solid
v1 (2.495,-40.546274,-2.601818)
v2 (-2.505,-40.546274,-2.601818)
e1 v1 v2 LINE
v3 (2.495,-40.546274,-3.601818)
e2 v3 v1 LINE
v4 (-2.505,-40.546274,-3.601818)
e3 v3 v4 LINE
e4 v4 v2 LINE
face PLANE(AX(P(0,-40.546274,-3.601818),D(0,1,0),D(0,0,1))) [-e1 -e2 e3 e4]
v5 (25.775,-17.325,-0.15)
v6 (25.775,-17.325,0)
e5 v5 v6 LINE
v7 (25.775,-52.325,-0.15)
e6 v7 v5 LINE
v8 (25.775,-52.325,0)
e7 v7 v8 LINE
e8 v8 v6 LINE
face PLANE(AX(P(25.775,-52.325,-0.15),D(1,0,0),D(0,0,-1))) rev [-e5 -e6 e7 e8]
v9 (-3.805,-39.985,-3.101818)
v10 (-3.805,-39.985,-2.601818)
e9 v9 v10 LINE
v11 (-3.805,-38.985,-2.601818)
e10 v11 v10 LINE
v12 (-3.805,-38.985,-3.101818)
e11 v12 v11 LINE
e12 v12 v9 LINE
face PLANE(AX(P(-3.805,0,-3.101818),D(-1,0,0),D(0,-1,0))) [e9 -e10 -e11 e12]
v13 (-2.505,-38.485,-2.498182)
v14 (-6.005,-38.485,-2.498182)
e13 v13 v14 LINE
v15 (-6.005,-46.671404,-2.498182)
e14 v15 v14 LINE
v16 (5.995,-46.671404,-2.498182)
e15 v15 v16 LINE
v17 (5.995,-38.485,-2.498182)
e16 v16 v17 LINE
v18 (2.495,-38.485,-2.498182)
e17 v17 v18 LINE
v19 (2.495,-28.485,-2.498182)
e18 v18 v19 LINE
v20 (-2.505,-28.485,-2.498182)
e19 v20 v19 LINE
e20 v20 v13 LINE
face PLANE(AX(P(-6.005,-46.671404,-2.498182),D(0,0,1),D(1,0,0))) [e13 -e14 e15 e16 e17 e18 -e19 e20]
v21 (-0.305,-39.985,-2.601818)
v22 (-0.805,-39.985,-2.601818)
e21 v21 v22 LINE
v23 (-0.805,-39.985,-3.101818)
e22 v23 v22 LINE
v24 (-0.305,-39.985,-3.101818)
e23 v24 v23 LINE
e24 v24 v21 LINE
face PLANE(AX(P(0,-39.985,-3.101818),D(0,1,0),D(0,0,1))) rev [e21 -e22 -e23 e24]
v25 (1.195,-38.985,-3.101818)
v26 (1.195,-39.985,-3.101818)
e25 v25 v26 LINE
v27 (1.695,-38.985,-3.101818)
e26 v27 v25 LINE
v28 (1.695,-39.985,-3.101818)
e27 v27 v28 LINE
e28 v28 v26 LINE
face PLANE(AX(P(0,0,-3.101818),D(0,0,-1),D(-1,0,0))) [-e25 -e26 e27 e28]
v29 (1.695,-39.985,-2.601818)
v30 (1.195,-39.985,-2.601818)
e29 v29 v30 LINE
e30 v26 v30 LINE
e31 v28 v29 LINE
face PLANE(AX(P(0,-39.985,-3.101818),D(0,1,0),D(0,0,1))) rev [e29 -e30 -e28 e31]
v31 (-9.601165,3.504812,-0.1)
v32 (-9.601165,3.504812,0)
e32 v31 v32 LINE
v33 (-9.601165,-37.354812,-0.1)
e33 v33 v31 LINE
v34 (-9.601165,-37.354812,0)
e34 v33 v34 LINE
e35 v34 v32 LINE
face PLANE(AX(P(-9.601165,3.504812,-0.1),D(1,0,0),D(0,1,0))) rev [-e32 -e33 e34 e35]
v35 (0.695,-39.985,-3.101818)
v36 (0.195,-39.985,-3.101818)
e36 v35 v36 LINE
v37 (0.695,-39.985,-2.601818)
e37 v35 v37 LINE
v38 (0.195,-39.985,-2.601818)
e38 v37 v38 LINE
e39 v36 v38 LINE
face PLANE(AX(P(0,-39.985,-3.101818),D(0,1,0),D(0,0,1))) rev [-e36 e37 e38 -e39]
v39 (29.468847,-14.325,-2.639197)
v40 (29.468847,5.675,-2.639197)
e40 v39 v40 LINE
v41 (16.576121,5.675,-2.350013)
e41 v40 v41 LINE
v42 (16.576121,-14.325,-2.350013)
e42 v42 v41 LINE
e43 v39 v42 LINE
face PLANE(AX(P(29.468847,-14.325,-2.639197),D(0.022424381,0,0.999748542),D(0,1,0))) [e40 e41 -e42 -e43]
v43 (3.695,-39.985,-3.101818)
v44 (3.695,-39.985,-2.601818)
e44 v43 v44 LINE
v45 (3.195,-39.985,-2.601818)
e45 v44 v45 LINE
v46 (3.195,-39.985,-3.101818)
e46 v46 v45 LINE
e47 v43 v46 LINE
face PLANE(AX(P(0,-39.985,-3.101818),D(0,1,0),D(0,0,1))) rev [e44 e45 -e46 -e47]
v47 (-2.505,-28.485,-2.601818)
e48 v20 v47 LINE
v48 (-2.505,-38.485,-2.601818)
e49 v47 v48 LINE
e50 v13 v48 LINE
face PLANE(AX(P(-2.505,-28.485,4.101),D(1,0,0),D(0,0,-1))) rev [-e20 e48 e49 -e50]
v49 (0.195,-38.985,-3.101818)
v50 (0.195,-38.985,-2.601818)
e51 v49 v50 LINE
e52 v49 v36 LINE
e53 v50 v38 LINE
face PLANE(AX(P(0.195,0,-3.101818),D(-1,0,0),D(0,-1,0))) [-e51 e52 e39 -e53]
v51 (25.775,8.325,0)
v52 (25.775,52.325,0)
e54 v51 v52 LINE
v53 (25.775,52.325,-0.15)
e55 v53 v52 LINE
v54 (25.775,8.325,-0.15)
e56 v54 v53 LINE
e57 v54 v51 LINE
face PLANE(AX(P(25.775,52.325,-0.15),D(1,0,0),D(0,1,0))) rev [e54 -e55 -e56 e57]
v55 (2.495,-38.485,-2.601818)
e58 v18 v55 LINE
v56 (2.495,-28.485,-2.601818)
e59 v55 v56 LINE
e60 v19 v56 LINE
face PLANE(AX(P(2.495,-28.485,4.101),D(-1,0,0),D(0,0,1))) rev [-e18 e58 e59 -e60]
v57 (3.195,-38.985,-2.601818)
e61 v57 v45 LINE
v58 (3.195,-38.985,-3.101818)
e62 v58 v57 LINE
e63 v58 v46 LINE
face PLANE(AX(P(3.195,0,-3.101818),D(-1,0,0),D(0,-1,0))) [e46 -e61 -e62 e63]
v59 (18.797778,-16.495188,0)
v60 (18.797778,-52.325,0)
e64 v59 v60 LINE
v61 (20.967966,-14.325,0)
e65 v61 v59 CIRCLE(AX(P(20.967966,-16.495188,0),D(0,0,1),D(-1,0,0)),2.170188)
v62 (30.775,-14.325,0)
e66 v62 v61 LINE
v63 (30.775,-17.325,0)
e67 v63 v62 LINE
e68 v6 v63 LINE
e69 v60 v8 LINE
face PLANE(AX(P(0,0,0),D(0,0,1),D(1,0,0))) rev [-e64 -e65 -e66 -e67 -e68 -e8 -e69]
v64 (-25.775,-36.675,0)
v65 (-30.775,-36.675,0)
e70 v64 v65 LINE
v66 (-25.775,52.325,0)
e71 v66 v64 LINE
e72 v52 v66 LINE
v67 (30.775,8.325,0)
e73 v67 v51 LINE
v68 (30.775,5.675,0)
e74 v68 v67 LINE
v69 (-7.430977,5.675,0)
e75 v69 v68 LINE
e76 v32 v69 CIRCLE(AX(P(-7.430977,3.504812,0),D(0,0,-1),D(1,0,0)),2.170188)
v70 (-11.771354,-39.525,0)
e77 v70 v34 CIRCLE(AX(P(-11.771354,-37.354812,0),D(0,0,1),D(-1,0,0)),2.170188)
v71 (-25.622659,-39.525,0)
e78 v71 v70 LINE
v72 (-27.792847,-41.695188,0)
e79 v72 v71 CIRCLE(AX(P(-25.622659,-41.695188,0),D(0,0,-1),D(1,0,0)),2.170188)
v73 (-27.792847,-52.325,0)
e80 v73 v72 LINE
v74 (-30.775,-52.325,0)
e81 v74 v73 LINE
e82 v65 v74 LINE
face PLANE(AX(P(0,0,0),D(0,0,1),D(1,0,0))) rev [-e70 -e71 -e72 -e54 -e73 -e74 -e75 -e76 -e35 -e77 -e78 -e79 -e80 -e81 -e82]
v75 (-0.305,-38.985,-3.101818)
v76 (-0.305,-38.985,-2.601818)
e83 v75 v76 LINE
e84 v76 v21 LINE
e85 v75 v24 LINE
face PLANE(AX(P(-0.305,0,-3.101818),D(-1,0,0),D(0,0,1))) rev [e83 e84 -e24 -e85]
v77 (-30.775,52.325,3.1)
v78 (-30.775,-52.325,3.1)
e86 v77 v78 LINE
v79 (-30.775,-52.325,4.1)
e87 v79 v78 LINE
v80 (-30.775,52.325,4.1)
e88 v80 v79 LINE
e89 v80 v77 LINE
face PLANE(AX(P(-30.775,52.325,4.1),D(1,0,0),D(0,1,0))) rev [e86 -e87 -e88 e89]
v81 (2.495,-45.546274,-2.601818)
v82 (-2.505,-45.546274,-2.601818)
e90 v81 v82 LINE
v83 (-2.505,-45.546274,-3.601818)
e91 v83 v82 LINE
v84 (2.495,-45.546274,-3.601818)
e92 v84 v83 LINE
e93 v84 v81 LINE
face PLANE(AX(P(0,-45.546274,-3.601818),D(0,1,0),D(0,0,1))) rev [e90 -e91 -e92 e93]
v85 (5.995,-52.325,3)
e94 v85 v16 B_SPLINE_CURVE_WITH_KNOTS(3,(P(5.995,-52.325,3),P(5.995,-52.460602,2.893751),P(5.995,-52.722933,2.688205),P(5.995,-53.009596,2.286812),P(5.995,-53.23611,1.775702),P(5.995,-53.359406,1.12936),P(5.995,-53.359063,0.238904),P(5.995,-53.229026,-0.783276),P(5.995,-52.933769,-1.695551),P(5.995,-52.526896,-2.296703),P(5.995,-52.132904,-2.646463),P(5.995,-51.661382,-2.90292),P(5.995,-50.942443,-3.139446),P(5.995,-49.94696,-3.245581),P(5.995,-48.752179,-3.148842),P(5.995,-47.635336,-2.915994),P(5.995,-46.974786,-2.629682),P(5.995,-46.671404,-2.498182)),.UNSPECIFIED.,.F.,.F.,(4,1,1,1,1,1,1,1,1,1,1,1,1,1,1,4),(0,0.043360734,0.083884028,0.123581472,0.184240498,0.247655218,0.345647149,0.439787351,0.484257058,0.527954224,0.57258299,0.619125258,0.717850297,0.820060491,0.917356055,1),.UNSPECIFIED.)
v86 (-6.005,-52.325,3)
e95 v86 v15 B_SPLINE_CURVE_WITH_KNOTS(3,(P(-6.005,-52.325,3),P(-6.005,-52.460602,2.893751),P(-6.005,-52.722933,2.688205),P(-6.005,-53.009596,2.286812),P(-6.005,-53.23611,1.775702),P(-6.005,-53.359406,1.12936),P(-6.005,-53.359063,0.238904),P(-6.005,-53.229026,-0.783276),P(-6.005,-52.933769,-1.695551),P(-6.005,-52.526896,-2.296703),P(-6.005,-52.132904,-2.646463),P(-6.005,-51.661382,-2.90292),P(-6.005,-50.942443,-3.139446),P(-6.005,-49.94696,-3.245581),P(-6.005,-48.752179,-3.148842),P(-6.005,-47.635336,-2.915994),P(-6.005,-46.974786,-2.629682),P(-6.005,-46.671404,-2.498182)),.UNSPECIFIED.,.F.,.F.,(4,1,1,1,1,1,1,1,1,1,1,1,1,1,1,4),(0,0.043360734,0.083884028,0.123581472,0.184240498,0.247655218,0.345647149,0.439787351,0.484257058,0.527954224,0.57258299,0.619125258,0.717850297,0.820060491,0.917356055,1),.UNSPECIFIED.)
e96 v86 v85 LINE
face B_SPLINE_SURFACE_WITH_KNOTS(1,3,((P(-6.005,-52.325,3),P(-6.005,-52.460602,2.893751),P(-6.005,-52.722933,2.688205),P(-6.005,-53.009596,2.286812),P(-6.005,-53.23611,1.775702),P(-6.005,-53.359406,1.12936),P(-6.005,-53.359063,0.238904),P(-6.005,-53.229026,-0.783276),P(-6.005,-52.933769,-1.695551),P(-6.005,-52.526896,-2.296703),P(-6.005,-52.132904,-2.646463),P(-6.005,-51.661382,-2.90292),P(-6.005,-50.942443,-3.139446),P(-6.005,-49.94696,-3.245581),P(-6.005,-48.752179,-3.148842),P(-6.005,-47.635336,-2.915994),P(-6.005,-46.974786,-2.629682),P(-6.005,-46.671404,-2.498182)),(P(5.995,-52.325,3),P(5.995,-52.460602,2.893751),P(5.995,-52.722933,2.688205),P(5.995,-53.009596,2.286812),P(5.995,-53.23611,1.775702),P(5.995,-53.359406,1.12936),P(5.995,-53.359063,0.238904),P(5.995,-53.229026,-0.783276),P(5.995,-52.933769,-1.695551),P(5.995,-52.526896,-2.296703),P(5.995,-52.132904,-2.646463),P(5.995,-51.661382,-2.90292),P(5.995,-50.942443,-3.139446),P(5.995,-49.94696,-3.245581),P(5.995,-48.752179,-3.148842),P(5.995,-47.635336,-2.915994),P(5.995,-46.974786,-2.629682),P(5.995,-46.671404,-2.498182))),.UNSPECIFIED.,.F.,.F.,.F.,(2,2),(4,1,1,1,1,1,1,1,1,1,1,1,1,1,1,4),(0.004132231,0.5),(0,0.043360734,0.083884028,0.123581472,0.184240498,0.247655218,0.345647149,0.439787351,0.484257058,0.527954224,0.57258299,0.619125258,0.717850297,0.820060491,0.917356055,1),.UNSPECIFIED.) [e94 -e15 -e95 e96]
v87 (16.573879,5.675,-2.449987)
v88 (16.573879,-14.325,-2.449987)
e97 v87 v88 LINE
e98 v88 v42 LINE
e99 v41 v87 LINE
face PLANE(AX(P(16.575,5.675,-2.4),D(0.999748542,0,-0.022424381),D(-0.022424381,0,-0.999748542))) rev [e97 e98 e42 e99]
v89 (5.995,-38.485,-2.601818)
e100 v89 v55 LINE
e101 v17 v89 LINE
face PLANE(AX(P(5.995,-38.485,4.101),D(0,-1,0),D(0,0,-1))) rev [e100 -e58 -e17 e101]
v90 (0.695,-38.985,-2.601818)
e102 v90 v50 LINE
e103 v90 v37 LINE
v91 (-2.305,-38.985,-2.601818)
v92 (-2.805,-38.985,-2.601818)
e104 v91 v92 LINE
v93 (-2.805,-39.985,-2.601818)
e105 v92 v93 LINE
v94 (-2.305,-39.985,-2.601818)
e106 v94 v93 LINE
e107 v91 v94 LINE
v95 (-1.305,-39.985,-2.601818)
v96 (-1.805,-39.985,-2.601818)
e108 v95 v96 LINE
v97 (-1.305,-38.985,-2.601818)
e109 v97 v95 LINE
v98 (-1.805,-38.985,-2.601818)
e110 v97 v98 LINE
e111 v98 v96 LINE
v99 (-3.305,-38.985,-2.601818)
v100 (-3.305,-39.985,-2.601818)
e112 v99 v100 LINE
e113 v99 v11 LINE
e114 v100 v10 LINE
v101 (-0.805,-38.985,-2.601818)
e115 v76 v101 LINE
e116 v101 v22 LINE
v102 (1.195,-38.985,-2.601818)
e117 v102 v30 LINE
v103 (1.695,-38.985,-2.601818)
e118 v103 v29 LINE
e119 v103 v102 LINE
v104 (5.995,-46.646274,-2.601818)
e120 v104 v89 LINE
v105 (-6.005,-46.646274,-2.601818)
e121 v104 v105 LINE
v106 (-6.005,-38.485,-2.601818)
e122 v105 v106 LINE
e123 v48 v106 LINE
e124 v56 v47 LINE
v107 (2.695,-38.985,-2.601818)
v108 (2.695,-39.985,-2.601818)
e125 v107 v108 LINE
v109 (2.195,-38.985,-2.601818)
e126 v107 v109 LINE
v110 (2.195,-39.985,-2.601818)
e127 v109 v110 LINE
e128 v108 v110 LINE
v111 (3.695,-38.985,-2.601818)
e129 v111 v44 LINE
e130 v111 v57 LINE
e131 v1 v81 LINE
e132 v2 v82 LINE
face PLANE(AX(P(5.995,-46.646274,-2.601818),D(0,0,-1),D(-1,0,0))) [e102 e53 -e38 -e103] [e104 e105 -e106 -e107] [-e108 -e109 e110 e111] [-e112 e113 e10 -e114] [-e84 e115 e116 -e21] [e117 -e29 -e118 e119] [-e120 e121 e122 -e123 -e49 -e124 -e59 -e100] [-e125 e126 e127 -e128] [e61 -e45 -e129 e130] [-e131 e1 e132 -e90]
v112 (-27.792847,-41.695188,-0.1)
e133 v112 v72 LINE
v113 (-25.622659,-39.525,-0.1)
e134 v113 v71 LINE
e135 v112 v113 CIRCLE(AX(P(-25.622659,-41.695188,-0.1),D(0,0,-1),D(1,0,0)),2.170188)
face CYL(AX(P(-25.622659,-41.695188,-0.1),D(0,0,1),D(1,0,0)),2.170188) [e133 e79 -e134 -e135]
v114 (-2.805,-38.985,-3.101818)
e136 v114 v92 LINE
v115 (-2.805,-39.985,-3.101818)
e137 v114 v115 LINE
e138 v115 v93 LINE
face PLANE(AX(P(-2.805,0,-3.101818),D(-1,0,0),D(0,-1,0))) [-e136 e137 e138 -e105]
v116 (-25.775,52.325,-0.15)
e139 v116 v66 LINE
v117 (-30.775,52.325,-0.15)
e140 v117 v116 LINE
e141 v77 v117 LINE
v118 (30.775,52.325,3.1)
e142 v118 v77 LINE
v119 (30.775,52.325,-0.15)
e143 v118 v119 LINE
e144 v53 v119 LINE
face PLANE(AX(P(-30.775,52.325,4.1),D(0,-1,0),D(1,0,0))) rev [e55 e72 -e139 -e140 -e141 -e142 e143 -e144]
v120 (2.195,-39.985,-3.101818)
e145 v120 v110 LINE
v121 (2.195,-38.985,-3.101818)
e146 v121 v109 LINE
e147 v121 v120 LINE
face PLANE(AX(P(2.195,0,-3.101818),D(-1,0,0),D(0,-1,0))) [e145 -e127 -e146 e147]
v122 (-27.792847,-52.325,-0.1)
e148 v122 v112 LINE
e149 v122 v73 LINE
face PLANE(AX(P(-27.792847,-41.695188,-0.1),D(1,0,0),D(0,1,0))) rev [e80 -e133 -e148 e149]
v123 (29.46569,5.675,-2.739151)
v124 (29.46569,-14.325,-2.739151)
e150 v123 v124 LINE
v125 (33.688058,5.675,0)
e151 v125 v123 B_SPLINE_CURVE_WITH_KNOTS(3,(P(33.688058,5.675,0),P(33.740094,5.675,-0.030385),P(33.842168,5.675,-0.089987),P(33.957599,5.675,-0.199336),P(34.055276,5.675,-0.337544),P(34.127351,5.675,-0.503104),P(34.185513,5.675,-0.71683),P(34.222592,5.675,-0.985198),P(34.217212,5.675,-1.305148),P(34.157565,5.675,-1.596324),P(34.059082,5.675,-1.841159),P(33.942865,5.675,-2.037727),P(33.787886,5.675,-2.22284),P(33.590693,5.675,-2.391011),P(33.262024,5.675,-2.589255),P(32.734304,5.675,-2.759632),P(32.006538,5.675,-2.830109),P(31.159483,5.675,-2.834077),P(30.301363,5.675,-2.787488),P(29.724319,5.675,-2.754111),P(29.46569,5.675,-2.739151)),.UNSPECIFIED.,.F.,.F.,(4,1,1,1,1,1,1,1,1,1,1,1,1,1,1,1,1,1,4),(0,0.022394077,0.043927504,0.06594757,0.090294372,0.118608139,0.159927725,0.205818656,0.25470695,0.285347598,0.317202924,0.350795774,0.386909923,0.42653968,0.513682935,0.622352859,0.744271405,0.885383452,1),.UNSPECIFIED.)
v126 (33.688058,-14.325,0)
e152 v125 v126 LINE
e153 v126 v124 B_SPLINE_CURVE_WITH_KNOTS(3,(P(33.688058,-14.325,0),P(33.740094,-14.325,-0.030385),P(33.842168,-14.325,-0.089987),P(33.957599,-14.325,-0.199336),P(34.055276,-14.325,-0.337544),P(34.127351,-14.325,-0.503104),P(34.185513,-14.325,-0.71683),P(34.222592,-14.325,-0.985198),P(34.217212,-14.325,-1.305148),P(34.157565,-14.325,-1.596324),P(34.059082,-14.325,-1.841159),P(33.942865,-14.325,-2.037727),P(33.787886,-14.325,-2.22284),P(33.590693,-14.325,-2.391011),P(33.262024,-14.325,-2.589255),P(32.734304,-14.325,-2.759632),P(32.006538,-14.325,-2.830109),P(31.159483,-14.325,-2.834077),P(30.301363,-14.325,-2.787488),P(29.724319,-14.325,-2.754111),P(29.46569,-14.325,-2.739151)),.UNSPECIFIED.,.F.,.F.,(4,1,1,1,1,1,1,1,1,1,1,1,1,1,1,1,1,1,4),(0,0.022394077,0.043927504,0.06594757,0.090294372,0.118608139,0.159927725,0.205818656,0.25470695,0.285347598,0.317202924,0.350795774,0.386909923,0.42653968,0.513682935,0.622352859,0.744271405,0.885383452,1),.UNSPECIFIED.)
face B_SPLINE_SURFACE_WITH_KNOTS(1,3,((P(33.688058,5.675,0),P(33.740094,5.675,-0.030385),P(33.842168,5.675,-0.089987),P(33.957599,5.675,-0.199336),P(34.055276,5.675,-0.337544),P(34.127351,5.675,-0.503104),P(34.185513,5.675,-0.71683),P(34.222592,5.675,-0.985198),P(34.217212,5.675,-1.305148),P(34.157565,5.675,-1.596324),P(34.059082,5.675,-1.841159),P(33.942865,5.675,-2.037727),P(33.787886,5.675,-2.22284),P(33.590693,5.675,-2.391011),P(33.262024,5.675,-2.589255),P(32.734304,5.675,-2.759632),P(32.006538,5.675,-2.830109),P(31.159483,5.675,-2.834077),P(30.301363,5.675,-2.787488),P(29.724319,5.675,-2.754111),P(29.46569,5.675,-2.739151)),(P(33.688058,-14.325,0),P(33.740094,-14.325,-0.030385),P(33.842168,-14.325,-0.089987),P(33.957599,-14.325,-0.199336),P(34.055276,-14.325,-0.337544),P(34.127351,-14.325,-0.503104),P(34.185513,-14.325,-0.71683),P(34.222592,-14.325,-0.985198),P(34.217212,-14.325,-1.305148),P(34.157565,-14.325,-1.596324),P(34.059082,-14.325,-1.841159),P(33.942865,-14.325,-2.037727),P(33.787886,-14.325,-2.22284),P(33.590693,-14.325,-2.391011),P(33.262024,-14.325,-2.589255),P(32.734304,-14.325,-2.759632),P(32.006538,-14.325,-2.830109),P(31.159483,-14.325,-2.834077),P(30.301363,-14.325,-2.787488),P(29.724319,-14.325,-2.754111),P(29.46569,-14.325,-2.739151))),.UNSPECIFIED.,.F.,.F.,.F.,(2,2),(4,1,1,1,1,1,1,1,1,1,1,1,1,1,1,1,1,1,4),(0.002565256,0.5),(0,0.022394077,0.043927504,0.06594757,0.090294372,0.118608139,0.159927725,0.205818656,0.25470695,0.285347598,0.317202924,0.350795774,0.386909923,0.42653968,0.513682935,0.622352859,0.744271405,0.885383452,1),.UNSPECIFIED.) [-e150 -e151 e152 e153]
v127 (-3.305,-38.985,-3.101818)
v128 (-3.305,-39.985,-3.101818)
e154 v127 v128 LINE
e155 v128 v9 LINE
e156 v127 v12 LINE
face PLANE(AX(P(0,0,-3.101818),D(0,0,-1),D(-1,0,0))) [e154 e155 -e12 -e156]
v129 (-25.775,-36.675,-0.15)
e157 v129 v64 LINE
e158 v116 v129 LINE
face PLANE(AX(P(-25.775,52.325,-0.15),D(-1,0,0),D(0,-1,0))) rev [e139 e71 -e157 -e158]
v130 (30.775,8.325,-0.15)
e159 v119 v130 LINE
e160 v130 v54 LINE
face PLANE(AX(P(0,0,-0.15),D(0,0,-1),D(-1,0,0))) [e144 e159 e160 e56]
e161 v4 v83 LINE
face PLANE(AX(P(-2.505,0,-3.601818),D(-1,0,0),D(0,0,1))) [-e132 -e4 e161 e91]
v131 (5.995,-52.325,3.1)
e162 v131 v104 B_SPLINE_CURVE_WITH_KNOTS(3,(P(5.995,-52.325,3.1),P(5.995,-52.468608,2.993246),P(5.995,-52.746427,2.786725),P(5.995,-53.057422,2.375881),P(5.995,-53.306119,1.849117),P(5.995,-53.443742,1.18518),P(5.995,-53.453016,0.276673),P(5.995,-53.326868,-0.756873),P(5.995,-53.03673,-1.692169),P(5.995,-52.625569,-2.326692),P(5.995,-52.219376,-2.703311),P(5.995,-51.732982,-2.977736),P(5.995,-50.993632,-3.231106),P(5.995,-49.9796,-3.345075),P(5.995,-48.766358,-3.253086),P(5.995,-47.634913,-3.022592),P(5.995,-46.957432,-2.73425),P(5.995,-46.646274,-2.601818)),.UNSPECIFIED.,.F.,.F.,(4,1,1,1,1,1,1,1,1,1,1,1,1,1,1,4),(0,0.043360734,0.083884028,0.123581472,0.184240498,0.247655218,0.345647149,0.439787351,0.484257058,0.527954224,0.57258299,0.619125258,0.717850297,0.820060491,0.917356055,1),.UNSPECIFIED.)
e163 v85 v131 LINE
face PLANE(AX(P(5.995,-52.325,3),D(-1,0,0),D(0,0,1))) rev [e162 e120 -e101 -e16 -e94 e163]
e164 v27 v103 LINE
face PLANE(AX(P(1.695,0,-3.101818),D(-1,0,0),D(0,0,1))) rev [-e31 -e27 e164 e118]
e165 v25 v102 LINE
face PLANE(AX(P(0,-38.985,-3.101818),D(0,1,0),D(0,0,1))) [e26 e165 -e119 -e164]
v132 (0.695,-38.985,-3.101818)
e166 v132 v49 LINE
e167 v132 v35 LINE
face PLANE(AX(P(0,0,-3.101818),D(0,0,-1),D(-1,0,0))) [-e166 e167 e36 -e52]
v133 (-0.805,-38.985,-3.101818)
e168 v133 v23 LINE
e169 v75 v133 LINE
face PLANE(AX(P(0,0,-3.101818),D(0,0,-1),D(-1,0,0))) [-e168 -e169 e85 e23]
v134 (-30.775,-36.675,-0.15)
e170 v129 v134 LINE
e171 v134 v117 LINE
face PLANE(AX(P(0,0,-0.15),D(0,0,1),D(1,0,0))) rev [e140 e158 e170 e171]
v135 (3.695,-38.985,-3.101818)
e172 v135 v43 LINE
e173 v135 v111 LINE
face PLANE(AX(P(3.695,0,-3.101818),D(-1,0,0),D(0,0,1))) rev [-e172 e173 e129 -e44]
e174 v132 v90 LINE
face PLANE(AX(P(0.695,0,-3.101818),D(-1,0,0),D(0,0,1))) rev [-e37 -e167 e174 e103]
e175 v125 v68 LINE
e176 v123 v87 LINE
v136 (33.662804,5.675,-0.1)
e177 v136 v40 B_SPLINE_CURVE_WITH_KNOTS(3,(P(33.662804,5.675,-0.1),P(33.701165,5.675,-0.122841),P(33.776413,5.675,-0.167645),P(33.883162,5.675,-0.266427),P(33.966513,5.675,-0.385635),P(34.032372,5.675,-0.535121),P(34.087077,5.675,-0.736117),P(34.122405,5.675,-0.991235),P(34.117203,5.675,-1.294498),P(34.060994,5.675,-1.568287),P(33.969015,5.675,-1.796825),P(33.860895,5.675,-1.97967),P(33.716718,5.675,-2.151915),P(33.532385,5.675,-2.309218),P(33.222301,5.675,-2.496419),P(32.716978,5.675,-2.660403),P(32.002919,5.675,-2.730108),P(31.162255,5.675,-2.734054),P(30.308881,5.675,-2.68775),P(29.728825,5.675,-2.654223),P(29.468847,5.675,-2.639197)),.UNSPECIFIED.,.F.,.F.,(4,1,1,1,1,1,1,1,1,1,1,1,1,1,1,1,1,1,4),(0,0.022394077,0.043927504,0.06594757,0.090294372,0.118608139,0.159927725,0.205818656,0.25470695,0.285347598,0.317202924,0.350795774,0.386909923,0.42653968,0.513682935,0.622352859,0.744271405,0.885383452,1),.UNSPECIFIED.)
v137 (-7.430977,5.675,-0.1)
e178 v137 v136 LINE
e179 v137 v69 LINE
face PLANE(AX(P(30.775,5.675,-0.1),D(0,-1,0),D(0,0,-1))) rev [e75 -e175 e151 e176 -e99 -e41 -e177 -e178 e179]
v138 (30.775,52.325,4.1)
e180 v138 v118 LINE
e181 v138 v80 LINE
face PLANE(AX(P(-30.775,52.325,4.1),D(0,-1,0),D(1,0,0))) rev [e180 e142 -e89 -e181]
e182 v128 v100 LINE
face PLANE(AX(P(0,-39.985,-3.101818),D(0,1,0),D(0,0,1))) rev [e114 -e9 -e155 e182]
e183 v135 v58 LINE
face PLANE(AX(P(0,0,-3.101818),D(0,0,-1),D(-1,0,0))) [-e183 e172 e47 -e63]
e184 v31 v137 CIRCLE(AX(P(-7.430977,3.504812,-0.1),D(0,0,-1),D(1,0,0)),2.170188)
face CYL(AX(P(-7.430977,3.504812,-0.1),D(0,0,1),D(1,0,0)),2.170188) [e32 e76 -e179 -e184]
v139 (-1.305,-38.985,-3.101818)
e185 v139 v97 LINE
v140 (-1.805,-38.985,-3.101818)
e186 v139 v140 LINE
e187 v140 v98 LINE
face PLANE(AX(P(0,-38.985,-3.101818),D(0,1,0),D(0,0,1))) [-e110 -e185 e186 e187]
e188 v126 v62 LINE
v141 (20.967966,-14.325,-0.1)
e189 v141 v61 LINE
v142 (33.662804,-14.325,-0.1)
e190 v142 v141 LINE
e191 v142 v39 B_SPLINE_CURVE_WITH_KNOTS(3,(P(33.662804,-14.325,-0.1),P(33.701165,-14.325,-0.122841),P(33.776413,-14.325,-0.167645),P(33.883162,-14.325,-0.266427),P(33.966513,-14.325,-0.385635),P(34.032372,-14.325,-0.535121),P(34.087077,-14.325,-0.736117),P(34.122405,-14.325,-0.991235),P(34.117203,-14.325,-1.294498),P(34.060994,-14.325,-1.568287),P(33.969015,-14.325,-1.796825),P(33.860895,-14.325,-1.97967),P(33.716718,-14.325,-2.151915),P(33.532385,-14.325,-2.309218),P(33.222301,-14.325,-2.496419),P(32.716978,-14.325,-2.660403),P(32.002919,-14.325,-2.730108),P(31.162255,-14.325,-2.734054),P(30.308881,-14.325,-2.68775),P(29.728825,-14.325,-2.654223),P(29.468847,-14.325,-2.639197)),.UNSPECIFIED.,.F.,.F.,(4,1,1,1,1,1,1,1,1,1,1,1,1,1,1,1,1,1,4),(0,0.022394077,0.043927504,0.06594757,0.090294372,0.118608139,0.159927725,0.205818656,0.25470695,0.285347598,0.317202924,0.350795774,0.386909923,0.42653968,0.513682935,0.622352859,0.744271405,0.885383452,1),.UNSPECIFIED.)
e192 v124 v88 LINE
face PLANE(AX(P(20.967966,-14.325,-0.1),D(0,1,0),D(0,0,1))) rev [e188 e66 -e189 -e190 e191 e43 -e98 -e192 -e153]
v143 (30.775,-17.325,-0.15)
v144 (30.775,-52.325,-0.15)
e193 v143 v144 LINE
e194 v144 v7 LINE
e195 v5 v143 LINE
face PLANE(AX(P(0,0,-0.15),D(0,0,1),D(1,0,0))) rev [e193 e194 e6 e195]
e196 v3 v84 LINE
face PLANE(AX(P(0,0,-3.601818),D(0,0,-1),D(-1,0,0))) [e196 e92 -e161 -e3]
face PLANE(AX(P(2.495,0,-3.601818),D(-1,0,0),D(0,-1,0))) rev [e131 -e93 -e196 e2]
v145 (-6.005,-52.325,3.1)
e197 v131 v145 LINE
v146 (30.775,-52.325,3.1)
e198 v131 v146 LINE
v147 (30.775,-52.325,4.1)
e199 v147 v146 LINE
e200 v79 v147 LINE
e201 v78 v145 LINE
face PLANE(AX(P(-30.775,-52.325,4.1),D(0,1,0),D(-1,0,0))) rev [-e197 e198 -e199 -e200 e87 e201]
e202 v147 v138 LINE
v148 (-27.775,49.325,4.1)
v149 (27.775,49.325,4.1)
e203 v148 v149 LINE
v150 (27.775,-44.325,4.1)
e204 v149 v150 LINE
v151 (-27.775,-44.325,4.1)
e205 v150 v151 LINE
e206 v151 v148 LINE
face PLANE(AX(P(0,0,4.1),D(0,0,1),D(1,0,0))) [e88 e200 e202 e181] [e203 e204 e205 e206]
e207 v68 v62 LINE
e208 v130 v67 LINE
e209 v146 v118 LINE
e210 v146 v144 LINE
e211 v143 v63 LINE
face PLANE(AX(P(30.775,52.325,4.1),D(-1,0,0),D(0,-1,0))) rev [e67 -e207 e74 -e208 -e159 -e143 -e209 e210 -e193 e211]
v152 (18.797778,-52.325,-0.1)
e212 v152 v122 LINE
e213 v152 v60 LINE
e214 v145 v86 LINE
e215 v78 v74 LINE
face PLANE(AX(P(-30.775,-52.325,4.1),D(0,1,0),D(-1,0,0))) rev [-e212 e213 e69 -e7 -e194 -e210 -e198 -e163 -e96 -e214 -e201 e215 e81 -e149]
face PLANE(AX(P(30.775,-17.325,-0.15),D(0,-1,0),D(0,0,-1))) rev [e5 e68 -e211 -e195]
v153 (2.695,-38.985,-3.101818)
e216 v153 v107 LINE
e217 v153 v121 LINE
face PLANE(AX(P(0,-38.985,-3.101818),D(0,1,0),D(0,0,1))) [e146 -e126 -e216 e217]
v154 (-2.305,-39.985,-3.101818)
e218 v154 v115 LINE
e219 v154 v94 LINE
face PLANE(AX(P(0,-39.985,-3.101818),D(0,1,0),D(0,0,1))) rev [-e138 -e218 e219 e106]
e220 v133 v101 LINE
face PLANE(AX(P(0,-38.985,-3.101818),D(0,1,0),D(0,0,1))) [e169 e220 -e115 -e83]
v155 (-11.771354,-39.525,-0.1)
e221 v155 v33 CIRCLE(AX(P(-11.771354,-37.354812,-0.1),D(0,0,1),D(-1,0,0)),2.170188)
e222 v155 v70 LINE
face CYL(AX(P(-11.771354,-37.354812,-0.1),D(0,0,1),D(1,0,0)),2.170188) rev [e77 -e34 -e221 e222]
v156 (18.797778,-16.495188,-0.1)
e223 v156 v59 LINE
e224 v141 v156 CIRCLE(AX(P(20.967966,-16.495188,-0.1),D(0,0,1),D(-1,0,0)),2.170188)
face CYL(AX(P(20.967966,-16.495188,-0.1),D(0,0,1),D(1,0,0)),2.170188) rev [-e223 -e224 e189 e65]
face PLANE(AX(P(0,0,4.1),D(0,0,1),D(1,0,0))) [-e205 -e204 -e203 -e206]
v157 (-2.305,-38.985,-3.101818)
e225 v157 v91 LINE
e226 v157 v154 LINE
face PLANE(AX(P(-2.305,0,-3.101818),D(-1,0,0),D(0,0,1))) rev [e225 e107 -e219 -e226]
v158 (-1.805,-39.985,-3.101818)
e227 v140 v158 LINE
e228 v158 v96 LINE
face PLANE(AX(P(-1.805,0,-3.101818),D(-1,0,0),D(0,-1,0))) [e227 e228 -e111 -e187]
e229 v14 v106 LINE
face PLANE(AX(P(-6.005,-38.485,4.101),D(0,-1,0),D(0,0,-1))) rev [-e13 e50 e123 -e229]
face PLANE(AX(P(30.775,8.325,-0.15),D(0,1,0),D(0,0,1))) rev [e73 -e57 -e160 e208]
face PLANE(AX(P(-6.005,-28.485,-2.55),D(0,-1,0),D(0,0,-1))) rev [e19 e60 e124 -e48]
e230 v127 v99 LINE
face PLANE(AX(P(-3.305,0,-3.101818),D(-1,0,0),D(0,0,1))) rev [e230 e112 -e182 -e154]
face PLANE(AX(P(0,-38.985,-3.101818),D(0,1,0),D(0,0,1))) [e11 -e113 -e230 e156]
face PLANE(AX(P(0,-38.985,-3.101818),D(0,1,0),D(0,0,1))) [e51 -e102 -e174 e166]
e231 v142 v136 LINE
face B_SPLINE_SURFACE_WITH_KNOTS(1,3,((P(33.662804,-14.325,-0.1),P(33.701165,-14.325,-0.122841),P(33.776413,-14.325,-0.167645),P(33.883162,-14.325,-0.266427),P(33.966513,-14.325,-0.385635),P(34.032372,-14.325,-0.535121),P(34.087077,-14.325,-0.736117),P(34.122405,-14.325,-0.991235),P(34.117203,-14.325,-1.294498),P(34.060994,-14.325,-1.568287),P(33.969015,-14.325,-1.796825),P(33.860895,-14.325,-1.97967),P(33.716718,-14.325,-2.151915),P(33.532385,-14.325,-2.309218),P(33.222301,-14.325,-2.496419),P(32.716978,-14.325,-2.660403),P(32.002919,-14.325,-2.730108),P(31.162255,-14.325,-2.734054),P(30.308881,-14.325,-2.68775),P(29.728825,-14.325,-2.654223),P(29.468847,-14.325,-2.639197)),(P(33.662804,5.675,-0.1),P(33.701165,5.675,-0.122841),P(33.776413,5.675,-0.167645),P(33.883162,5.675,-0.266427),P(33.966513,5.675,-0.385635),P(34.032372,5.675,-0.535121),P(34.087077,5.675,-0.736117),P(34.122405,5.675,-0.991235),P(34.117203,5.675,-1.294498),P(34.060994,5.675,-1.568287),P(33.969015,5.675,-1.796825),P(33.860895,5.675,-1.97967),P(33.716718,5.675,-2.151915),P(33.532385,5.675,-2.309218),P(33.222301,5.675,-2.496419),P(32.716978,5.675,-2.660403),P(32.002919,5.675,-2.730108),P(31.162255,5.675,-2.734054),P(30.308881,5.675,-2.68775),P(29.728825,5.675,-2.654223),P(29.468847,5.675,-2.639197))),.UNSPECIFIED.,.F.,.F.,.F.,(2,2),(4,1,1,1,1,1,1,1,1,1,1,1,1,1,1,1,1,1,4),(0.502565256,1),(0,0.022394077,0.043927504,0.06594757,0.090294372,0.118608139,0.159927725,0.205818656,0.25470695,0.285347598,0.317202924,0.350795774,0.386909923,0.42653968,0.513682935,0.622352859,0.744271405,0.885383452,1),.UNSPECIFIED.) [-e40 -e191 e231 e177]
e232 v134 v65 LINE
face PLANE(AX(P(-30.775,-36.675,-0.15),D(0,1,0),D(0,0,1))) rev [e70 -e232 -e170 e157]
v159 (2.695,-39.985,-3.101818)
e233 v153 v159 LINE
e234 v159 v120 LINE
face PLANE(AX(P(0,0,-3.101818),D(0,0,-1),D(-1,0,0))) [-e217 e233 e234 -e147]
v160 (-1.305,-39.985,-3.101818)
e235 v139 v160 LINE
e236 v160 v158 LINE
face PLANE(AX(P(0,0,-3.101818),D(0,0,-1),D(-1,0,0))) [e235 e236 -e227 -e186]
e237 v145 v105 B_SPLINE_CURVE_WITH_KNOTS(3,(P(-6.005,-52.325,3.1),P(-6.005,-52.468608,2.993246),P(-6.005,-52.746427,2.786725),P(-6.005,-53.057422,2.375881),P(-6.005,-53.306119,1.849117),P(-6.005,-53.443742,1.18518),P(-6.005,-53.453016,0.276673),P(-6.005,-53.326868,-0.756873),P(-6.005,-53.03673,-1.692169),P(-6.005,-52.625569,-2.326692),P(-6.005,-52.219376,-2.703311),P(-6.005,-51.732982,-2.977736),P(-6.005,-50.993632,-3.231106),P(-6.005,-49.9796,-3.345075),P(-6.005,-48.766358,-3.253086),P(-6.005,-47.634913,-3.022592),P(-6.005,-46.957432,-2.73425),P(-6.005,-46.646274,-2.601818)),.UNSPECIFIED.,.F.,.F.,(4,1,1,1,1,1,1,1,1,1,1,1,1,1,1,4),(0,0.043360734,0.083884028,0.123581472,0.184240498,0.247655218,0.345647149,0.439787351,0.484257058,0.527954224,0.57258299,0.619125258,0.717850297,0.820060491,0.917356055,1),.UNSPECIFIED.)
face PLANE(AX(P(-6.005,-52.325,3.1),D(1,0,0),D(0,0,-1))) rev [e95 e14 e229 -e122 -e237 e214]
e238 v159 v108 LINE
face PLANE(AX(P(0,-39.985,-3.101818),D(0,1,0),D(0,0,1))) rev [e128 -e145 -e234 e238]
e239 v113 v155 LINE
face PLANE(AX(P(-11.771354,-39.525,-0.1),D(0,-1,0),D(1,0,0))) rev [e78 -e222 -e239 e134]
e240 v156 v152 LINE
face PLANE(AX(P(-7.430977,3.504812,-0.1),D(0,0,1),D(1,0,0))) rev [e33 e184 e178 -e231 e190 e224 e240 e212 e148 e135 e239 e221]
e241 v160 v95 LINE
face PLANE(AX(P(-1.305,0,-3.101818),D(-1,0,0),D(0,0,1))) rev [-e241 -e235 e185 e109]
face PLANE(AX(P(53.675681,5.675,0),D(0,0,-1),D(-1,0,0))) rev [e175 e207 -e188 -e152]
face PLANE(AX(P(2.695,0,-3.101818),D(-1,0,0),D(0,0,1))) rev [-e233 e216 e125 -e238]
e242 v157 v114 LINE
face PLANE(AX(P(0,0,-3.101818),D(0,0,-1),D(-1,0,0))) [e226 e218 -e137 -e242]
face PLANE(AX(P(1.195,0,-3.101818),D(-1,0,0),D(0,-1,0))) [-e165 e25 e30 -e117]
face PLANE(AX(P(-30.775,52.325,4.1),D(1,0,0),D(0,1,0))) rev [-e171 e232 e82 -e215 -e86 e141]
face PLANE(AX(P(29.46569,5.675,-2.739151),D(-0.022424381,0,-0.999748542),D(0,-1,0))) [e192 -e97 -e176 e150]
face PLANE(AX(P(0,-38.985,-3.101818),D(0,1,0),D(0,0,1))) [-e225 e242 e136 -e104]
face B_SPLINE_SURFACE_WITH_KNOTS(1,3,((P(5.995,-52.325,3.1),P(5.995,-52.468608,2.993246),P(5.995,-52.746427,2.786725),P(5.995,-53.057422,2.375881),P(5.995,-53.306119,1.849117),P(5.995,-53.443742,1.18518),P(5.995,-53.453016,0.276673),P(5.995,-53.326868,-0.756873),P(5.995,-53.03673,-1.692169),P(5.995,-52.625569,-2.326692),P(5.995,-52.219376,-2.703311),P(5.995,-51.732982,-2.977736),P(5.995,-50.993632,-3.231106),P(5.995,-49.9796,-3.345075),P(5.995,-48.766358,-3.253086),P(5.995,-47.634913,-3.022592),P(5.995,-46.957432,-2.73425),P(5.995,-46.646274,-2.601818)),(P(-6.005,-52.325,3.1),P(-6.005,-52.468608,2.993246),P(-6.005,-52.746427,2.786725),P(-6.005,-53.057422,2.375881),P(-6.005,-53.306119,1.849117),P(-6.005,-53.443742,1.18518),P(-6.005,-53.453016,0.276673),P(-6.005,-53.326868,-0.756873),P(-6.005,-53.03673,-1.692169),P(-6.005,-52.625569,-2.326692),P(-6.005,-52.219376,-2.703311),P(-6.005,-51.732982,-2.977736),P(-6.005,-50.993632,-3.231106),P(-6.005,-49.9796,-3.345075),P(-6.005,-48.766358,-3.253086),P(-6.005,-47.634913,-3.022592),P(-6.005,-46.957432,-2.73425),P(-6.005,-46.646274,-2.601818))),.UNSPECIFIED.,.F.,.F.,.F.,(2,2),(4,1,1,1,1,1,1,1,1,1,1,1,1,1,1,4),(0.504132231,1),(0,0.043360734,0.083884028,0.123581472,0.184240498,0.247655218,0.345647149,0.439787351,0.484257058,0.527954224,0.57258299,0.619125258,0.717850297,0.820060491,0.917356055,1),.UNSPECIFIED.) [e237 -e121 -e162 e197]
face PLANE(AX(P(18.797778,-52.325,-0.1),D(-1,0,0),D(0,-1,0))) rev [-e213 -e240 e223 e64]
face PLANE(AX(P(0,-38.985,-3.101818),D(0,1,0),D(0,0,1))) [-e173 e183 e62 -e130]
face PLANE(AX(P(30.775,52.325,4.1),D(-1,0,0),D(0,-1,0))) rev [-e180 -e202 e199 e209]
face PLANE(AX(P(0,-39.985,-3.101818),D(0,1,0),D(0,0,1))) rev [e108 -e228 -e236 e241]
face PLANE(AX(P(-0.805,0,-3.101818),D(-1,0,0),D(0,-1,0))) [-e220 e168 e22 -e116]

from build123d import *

# Parameters (mm, degrees)
SKETCH_1_W          = 61.55
SKETCH_1_H          = 104.65
EXTRUDE_1_DEPTH     = 4.1
EXTRUDE_2_DEPTH     = 0.1
SKETCH_13_W         = 5
SKETCH_13_H         = 89
SKETCH_13_H_2       = 44
SKETCH_13_H_3       = 35
EXTRUDE_3_DEPTH     = 0.15
SWEEP_START         = -14.325
SWEEP_1_DEPTH       = 20
SWEEP_START_2       = -6.005
SWEEP_2_DEPTH       = 12
CUT_EXTRUDE_1_REACH = 65.813
SKETCH_21_W         = 3.5
SKETCH_21_H         = 10
SKETCH_22_W         = 5
SKETCH_22_H         = 5
EXTRUDE_4_DEPTH     = 1
SKETCH_22_3_W       = 0.5
SKETCH_22_3_H       = 1
EXTRUDE_5_DEPTH     = 0.5


# Read off the part's stored shape, not the designer's step: 扫描1, 扫描2
with BuildPart() as part:
    # 草图1 → 凸台-拉伸1 (new body)
    with BuildSketch(Plane.XY):
        Rectangle(SKETCH_1_W, SKETCH_1_H)
    extrude(amount=EXTRUDE_1_DEPTH)

    # 草图12 → 凸台-拉伸2 (add)
    with BuildSketch(Plane(origin=(0, 0, 0), x_dir=(-1, 0, 0), z_dir=(0, 0, -1))):
        with BuildLine():
            Line((-30.775, 5.675), (7.43097714, 5.675))
            ThreePointArc((7.43097714, 5.675), (8.96553195, 5.039366586), (9.601165364, 3.504811776))
            Line((9.601165364, 3.504811776), (9.601165364, -37.354811776))
            ThreePointArc((9.601165364, -37.354811776), (10.236798778, -38.889366586), (11.771353588, -39.525))
            Line((11.771353588, -39.525), (25.622658883, -39.525))
            ThreePointArc((25.622658883, -39.525), (27.157213692, -40.160633414), (27.792847106, -41.695188224))
            Line((27.792847106, -41.695188224), (27.792847106, -52.325))
            Line((27.792847106, -52.325), (-18.797778056, -52.325))
            Line((-18.797778056, -52.325), (-18.797778056, -16.495188224))
            ThreePointArc((-18.797778056, -16.495188224), (-19.43341147, -14.960633414), (-20.96796628, -14.325))
            Line((-20.96796628, -14.325), (-30.775, -14.325))
            Line((-30.775, -14.325), (-30.775, 5.675))
        make_face()
    extrude(amount=EXTRUDE_2_DEPTH)

    # 草图13 → 凸台-拉伸3 (add)
    with BuildSketch(Plane(origin=(0, 0, 0), x_dir=(-1, 0, 0), z_dir=(0, 0, -1))):
        with Locations((28.275, 7.825)):
            Rectangle(SKETCH_13_W, SKETCH_13_H)
        with Locations((-28.275, 30.325)):
            Rectangle(SKETCH_13_W, SKETCH_13_H_2)
        with Locations((-28.275, -34.825)):
            Rectangle(SKETCH_13_W, SKETCH_13_H_3)
    extrude(amount=EXTRUDE_3_DEPTH)

    # 扫描1 outline → 扫描1 (add)
    with BuildSketch(Plane(origin=(0, 0, 0), x_dir=(1, 0, 0), z_dir=(0, 1, 0)).offset(SWEEP_START)):
        with BuildLine():
            Line((30.775, 0), (33.688057754, 0))
            add(Edge.make_bspline(
                [(33.688057754, 0), (33.740094349, 0.030384855), (33.842167666, 0.089986814), (33.957599344, 0.199336205), (34.055275833, 0.337544191), (34.127351146, 0.503103592), (34.185512523, 0.716829871), (34.22259154, 0.985198024), (34.217211516, 1.305147843), (34.157564693, 1.596323551), (34.059081534, 1.841158616), (33.942865451, 2.037727084), (33.787885639, 2.222839862), (33.590692863, 2.391010577), (33.262024043, 2.589254607), (32.734303663, 2.759632394), (32.006537514, 2.830109489), (31.159482774, 2.834077419), (30.301363299, 2.787487983), (29.724318905, 2.754110628), (29.465689882, 2.739151029)],
                knots=[0, 0, 0, 0, 0.022394077, 0.043927504, 0.06594757, 0.090294372, 0.118608139, 0.159927725, 0.205818656, 0.25470695, 0.285347598, 0.317202924, 0.350795774, 0.386909923, 0.42653968, 0.513682935, 0.622352859, 0.744271405, 0.885383452, 1, 1, 1, 1], degree=3))
            Line((29.465689882, 2.739151029), (16.573878781, 2.449987427))
            Line((16.573878781, 2.449987427), (16.576121219, 2.350012573))
            Line((16.576121219, 2.350012573), (29.468846669, 2.639196684))
            add(Edge.make_bspline(
                [(33.66280425, 0.1), (33.701165427, 0.12284106), (33.77641348, 0.167645351), (33.88316176, 0.26642733), (33.966512799, 0.385635161), (34.032372412, 0.535121016), (34.087077442, 0.736116999), (34.122405453, 0.991235451), (34.117202793, 1.294498152), (34.060993674, 1.568287463), (33.969014807, 1.796825073), (33.860895162, 1.979670143), (33.716718378, 2.151914558), (33.532385119, 2.309217599), (33.222301128, 2.496419386), (32.71697835, 2.660403065), (32.002919105, 2.730108386), (31.162255161, 2.734053994), (30.308880523, 2.687749647), (29.728825185, 2.654223135), (29.468846669, 2.639196684)],
                knots=[0, 0, 0, 0, 0.022394077, 0.043927504, 0.06594757, 0.090294372, 0.118608139, 0.159927725, 0.205818656, 0.25470695, 0.285347598, 0.317202924, 0.350795774, 0.386909923, 0.42653968, 0.513682935, 0.622352859, 0.744271405, 0.885383452, 1, 1, 1, 1], degree=3))
            Line((33.66280425, 0.1), (30.775, 0.1))
            Line((30.775, 0.1), (30.775, 0))
        make_face()
    extrude(amount=SWEEP_1_DEPTH)

    # 扫描2 outline → 扫描2 (add)
    with BuildSketch(Plane.YZ.offset(SWEEP_START_2)):
        with BuildLine():
            add(Edge.make_bspline(
                [(-52.325, 3), (-52.460602146, 2.893750812), (-52.722932906, 2.688205168), (-53.009596176, 2.286811717), (-53.236110287, 1.775702365), (-53.359405567, 1.129360272), (-53.359062945, 0.238903879), (-53.229025848, -0.783276027), (-52.933769169, -1.695551183), (-52.526896187, -2.296702581), (-52.132903591, -2.646463291), (-51.661381942, -2.902920315), (-50.942443081, -3.139445785), (-49.94695976, -3.245581242), (-48.75217865, -3.148841506), (-47.635336399, -2.915993871), (-46.974786487, -2.629681533), (-46.67140425, -2.498181891)],
                knots=[0, 0, 0, 0, 0.043360734, 0.083884028, 0.123581472, 0.184240498, 0.247655218, 0.345647149, 0.439787351, 0.484257058, 0.527954224, 0.57258299, 0.619125258, 0.717850297, 0.820060491, 0.917356055, 1, 1, 1, 1], degree=3))
            Line((-52.325, 3), (-52.325, 3.1))
            add(Edge.make_bspline(
                [(-52.325, 3.1), (-52.468608186, 2.993246309), (-52.746427128, 2.786724673), (-53.057421939, 2.375880968), (-53.306118632, 1.849117463), (-53.443742145, 1.185180174), (-53.453016098, 0.27667256), (-53.326868431, -0.756873175), (-53.036730374, -1.692169497), (-52.625569397, -2.326691599), (-52.219376389, -2.703311261), (-51.732982096, -2.977735995), (-50.993631594, -3.23110648), (-49.979600344, -3.345075131), (-48.766358256, -3.253086402), (-47.634912854, -3.022591855), (-46.957432057, -2.73424992), (-46.646273679, -2.601818109)],
                knots=[0, 0, 0, 0, 0.043360734, 0.083884028, 0.123581472, 0.184240498, 0.247655218, 0.345647149, 0.439787351, 0.484257058, 0.527954224, 0.57258299, 0.619125258, 0.717850297, 0.820060491, 0.917356055, 1, 1, 1, 1], degree=3))
            Line((-46.646273679, -2.601818109), (-28.485, -2.601818109))
            Line((-28.485, -2.601818109), (-28.485, -2.498181891))
            Line((-28.485, -2.498181891), (-46.67140425, -2.498181891))
        make_face()
    extrude(amount=SWEEP_2_DEPTH)

    # 草图21 → 切除-拉伸1 (cut, up to next)
    with BuildSketch(Plane(origin=(0, 0, -2.601818109), x_dir=(-1, 0, 0), z_dir=(0, 0, -1)), mode=Mode.PRIVATE) as cut_extrude_1_sk1:
        with Locations((-4.245, -33.485)):
            Rectangle(SKETCH_21_W, SKETCH_21_H)
    cut_extrude_1_tool1 = extrude(cut_extrude_1_sk1.sketch, amount=-CUT_EXTRUDE_1_REACH, mode=Mode.PRIVATE) & part.part
    # 草图21 → 切除-拉伸1 (cut, up to next)
    with BuildSketch(Plane(origin=(0, 0, -2.601818109), x_dir=(-1, 0, 0), z_dir=(0, 0, -1)), mode=Mode.PRIVATE) as cut_extrude_1_sk2:
        with Locations((4.255, -33.485)):
            Rectangle(SKETCH_21_W, SKETCH_21_H)
    cut_extrude_1_tool2 = extrude(cut_extrude_1_sk2.sketch, amount=-CUT_EXTRUDE_1_REACH, mode=Mode.PRIVATE) & part.part
    add(cut_extrude_1_tool1.solids().sort_by_distance((4.245, -33.485, -2.601818))[0], mode=Mode.SUBTRACT)
    add(cut_extrude_1_tool2.solids().sort_by_distance((-4.255, -33.485, -2.601818))[0], mode=Mode.SUBTRACT)

    # 草图22 → 凸台-拉伸4 (add)
    with BuildSketch(Plane(origin=(0, 0, -2.601818109), x_dir=(-1, 0, 0), z_dir=(0, 0, -1))):
        with Locations((0.005, -43.046273679)):
            Rectangle(SKETCH_22_W, SKETCH_22_H)
    extrude(amount=EXTRUDE_4_DEPTH)

    # 草图22<3> → 凸台-拉伸5 (add)
    with BuildSketch(Plane(origin=(0, 0, -2.601818109), x_dir=(-1, 0, 0), z_dir=(0, 0, -1))):
        with Locations((-3.445, -39.485)):
            Rectangle(SKETCH_22_3_W, SKETCH_22_3_H)
        with Locations((-2.445, -39.485)):
            Rectangle(SKETCH_22_3_W, SKETCH_22_3_H)
        with Locations((-1.445, -39.485)):
            Rectangle(SKETCH_22_3_W, SKETCH_22_3_H)
        with Locations((-0.445, -39.485)):
            Rectangle(SKETCH_22_3_W, SKETCH_22_3_H)
        with Locations((0.555, -39.485)):
            Rectangle(SKETCH_22_3_W, SKETCH_22_3_H)
        with Locations((1.555, -39.485)):
            Rectangle(SKETCH_22_3_W, SKETCH_22_3_H)
        with Locations((2.555, -39.485)):
            Rectangle(SKETCH_22_3_W, SKETCH_22_3_H)
        with Locations((3.555, -39.485)):
            Rectangle(SKETCH_22_3_W, SKETCH_22_3_H)
    extrude(amount=EXTRUDE_5_DEPTH)


solid = part.part
